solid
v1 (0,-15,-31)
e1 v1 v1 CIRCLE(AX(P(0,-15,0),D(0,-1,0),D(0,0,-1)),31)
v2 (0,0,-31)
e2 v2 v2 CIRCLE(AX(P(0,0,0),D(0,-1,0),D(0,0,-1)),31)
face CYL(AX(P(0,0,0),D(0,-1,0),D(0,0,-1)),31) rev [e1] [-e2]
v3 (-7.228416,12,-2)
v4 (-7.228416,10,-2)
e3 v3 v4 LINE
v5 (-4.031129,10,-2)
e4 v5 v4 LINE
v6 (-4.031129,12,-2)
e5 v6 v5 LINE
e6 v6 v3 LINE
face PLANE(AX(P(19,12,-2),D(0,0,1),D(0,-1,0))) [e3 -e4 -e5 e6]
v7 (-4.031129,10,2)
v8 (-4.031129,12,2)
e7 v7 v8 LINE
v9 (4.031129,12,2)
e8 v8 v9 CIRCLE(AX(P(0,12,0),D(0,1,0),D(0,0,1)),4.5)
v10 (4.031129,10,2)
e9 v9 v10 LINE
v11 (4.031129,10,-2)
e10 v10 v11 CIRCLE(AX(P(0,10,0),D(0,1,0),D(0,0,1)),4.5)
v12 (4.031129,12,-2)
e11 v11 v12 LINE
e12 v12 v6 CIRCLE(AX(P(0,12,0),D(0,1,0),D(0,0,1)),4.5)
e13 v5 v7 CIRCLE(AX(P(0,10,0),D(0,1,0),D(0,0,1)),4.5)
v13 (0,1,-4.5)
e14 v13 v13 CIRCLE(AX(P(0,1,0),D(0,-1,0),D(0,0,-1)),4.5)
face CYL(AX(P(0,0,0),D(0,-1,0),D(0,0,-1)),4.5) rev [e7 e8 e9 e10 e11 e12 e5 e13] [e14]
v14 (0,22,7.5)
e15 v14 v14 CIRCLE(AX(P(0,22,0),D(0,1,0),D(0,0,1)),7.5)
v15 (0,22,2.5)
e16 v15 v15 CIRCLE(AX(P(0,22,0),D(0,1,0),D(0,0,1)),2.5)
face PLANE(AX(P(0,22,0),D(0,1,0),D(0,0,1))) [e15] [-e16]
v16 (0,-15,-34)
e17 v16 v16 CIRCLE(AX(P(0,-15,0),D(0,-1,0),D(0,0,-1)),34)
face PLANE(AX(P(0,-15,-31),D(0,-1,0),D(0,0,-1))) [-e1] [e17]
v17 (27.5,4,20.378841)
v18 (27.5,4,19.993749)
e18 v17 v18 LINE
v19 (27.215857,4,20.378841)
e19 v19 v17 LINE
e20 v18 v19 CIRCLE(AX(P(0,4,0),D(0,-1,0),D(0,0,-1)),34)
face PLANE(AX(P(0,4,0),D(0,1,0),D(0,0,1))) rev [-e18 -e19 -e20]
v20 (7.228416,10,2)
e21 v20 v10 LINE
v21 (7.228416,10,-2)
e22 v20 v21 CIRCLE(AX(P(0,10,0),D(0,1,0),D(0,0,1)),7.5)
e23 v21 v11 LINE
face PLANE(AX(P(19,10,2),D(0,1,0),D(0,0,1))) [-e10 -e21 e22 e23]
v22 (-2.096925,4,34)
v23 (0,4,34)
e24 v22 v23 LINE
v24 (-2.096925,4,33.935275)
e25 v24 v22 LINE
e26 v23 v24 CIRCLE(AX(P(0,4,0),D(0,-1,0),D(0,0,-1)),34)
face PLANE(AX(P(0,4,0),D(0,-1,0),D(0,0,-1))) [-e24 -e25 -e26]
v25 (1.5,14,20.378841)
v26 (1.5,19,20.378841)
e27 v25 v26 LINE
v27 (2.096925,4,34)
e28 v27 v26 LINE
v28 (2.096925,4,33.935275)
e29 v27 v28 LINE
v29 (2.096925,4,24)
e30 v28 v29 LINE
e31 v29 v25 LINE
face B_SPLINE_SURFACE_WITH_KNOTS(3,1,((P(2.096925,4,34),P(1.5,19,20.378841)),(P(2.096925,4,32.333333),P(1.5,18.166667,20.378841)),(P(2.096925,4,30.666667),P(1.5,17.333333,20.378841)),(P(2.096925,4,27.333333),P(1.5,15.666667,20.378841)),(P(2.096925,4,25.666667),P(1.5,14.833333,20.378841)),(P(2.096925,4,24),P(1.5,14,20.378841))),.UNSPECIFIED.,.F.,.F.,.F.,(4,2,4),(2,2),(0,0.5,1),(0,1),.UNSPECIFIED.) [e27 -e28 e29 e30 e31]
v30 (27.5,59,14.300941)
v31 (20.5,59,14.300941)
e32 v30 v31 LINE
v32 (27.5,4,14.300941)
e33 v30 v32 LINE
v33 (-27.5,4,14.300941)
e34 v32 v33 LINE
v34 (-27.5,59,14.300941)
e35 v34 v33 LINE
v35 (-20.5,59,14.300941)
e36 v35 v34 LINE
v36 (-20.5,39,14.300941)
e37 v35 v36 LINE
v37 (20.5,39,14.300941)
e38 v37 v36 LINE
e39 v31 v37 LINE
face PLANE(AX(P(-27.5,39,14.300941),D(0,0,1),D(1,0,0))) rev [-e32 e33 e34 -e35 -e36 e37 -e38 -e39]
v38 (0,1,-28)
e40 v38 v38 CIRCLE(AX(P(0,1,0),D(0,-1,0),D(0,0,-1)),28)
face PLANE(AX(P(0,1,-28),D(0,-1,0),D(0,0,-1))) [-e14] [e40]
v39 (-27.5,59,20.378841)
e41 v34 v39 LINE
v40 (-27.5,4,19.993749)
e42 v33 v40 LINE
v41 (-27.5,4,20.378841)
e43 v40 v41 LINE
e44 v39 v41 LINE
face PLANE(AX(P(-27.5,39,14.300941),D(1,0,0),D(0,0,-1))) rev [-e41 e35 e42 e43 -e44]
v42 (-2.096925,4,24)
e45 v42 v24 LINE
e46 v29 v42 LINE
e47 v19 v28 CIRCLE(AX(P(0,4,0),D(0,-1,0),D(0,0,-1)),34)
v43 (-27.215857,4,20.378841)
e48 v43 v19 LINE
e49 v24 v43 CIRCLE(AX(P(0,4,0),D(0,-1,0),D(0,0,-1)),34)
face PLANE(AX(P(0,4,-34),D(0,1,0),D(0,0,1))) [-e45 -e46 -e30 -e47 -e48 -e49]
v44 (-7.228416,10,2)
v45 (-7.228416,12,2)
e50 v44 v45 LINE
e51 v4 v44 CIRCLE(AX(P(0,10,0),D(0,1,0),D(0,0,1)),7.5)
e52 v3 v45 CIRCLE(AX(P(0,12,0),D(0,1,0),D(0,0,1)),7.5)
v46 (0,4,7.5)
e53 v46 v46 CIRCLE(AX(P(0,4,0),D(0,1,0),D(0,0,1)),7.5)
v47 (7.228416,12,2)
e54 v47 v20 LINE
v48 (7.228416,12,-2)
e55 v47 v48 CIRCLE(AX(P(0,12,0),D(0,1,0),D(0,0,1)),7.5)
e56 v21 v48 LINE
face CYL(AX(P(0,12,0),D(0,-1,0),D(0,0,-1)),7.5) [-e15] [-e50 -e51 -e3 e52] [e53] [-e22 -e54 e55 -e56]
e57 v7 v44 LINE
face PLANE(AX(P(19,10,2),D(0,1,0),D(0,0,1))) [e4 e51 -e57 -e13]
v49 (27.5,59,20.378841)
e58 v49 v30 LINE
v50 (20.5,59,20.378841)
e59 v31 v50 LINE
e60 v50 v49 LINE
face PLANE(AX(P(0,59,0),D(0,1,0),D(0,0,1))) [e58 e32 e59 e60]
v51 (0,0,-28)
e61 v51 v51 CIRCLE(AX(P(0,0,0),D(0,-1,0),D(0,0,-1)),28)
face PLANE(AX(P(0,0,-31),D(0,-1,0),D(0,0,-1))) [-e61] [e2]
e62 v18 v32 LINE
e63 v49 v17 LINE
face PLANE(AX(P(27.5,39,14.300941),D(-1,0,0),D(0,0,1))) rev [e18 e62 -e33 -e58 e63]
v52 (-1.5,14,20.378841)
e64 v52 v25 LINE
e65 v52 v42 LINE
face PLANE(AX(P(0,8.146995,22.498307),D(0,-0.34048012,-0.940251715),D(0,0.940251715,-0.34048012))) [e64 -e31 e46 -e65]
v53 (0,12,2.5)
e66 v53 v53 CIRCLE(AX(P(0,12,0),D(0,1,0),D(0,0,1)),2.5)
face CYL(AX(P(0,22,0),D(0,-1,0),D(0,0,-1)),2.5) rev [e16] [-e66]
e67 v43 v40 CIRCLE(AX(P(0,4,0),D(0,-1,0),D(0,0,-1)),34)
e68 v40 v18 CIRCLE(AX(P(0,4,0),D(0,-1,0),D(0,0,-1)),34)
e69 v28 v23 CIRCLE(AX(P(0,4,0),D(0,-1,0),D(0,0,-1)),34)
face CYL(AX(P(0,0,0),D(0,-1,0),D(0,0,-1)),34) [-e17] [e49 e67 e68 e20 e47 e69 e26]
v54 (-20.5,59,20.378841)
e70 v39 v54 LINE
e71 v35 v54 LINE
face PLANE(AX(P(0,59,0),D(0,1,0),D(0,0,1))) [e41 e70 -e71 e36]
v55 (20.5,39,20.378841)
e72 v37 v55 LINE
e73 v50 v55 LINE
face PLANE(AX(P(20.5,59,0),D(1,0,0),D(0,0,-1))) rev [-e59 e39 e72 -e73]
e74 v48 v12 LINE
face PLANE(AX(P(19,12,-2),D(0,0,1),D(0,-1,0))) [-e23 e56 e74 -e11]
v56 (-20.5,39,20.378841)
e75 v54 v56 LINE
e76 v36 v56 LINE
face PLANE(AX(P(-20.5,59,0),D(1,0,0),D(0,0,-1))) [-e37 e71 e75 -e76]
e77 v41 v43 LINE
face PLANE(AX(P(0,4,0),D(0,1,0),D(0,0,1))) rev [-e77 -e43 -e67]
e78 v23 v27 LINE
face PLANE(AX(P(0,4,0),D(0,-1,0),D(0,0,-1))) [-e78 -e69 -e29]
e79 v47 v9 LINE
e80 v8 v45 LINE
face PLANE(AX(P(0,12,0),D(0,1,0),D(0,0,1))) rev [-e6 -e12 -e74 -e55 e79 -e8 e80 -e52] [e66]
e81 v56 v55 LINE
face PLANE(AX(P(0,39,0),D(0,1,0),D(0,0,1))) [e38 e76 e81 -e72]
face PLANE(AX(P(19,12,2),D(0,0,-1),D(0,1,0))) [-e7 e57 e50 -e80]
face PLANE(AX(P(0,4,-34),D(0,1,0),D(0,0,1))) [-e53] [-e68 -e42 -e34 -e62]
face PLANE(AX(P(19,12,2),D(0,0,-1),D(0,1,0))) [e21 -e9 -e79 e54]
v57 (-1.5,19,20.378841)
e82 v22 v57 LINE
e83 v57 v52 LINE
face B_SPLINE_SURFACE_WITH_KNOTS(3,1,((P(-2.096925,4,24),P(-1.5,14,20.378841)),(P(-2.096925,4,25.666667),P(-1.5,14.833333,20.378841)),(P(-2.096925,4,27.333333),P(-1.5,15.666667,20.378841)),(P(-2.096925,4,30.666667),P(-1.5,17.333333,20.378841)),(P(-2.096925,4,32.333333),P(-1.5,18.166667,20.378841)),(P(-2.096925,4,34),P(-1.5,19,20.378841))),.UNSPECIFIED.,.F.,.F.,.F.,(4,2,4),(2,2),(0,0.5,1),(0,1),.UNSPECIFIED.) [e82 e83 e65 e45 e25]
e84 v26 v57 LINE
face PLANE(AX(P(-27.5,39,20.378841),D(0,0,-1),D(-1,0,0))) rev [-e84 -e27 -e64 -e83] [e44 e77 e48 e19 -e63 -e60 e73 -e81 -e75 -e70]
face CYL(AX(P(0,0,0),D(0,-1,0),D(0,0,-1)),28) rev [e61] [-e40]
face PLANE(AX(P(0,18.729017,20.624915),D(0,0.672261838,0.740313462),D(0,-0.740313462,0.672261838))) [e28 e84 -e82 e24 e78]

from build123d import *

# Parameters (mm, degrees)
SKETCH10_R              = 7.5
SKETCH10_R_2            = 4.5
BOSS_EXTRUDE2_DEPTH     = 8
CUT_EXTRUDE2_DEPTH      = 19
CUT_EXTRUDE2_DEPTH_BACK = 12
SKETCH11_W              = 4
SKETCH11_H              = 2
SKETCH13_R              = 7.5
SKETCH13_R_2            = 2.5
BOSS_EXTRUDE3_DEPTH     = 10
SKETCH15_W              = 55
SKETCH15_H              = 6.077899871
BOSS_EXTRUDE4_DEPTH     = 35
SKETCH16_W              = 7
SKETCH16_H              = 6.077899871
BOSS_EXTRUDE5_DEPTH     = 20


with BuildPart() as part:
    # Sketch2 → Revolve1 (revolve)
    with BuildSketch(Plane(origin=(0, 0, 0), x_dir=(0, 0, -1), z_dir=(1, 0, 0))):
        Polygon((31, 0), (31, -15), (34, -15), (34, 4), (31, 4), (4.5, 4), (4.5, 1), (28, 1), (28, 0), align=None)
    revolve(axis=Axis((0, 0, 0), (0, 1, 0)))

    # Sketch10 → Boss-Extrude2 (add)
    with BuildSketch(Plane(origin=(0, 4, 0), x_dir=(1, 0, 0), z_dir=(0, 1, 0))):
        with Locations(Location((0, 0, 0), (0, 0, 270))):
            Circle(SKETCH10_R)
        with Locations(Location((0, 0, 0), (0, 0, 90))):
            Circle(SKETCH10_R_2, mode=Mode.SUBTRACT)
    extrude(amount=BOSS_EXTRUDE2_DEPTH)

    # Sketch11 → Cut-Extrude2 (cut, two sides: drawn at the far end of the back side and taken through both)
    with BuildSketch(Plane(origin=(0, 0, 0), x_dir=(0, 0, -1), z_dir=(1, 0, 0)).offset(-CUT_EXTRUDE2_DEPTH_BACK)):
        with Locations((0, 11)):
            Rectangle(SKETCH11_W, SKETCH11_H)
    extrude(amount=CUT_EXTRUDE2_DEPTH + CUT_EXTRUDE2_DEPTH_BACK, mode=Mode.SUBTRACT)

    # Sketch13 → Boss-Extrude3 (add)
    with BuildSketch(Plane(origin=(0, 12, 0), x_dir=(1, 0, 0), z_dir=(0, 1, 0))):
        with Locations(Location((0, 0, 0), (0, 0, 270))):
            Circle(SKETCH13_R)
        with Locations(Location((0, 0, 0), (0, 0, 270))):
            Circle(SKETCH13_R_2, mode=Mode.SUBTRACT)
    extrude(amount=BOSS_EXTRUDE3_DEPTH)

    # Sketch15 → Boss-Extrude4 (add)
    with BuildSketch(Plane(origin=(0, 4, 0), x_dir=(1, 0, 0), z_dir=(0, 1, 0))):
        with Locations((0, -17.339890807)):
            Rectangle(SKETCH15_W, SKETCH15_H)
    extrude(amount=BOSS_EXTRUDE4_DEPTH)

    # Sketch16 → Boss-Extrude5 (add)
    with BuildSketch(Plane(origin=(0, 39, 0), x_dir=(1, 0, 0), z_dir=(0, 1, 0))):
        with Locations((24, -17.339890807)):
            Rectangle(SKETCH16_W, SKETCH16_H)
        with Locations((-24, -17.339890807)):
            Rectangle(SKETCH16_W, SKETCH16_H)
    extrude(amount=BOSS_EXTRUDE5_DEPTH)

    # Loft1: read off the stored shape, not the designer's step
    # Loft1: loft between two sections, ruled curve by curve
    loft1_from = [
        Edge.make_bspline([(-2.096925142, 4, 24), (-2.096925142, 4, 25.666666667), (-2.096925142, 4, 27.333333333), (-2.096925142, 4, 30.666666667), (-2.096925142, 4, 32.333333333), (-2.096925142, 4, 34)], [0, 0, 0, 0, 0.5, 0.5, 1, 1, 1, 1], 3),
        Edge.make_bspline([(2.096925142, 4, 34), (2.096925142, 4, 32.333333333), (2.096925142, 4, 30.666666667), (2.096925142, 4, 27.333333333), (2.096925142, 4, 25.666666667), (2.096925142, 4, 24)], [0, 0, 0, 0, 0.5, 0.5, 1, 1, 1, 1], 3),
        Edge.make_line((-2.096925142, 4, 24), (2.096925142, 4, 24)),
        Edge.make_line((2.096925142, 4, 34), (-2.096925142, 4, 34)),
    ]
    loft1_to = [
        Edge.make_bspline([(-1.5, 14, 20.378840742), (-1.5, 14.833333333, 20.378840742), (-1.5, 15.666666667, 20.378840742), (-1.5, 17.333333333, 20.378840742), (-1.5, 18.166666667, 20.378840742), (-1.5, 19, 20.378840742)], [0, 0, 0, 0, 0.5, 0.5, 1, 1, 1, 1], 3),
        Edge.make_bspline([(1.5, 19, 20.378840742), (1.5, 18.166666667, 20.378840742), (1.5, 17.333333333, 20.378840742), (1.5, 15.666666667, 20.378840742), (1.5, 14.833333333, 20.378840742), (1.5, 14, 20.378840742)], [0, 0, 0, 0, 0.5, 0.5, 1, 1, 1, 1], 3),
        Edge.make_line((-1.5, 14, 20.378840742), (1.5, 14, 20.378840742)),
        Edge.make_line((1.5, 19, 20.378840742), (-1.5, 19, 20.378840742)),
    ]
    loft1 = Solid(Shell([*[Face.make_surface_from_curves(loft1_from[k], loft1_to[k]) for k in range(4)], Face(Wire(loft1_from)), Face(Wire(loft1_to))]))
    add(loft1)


solid = part.part
